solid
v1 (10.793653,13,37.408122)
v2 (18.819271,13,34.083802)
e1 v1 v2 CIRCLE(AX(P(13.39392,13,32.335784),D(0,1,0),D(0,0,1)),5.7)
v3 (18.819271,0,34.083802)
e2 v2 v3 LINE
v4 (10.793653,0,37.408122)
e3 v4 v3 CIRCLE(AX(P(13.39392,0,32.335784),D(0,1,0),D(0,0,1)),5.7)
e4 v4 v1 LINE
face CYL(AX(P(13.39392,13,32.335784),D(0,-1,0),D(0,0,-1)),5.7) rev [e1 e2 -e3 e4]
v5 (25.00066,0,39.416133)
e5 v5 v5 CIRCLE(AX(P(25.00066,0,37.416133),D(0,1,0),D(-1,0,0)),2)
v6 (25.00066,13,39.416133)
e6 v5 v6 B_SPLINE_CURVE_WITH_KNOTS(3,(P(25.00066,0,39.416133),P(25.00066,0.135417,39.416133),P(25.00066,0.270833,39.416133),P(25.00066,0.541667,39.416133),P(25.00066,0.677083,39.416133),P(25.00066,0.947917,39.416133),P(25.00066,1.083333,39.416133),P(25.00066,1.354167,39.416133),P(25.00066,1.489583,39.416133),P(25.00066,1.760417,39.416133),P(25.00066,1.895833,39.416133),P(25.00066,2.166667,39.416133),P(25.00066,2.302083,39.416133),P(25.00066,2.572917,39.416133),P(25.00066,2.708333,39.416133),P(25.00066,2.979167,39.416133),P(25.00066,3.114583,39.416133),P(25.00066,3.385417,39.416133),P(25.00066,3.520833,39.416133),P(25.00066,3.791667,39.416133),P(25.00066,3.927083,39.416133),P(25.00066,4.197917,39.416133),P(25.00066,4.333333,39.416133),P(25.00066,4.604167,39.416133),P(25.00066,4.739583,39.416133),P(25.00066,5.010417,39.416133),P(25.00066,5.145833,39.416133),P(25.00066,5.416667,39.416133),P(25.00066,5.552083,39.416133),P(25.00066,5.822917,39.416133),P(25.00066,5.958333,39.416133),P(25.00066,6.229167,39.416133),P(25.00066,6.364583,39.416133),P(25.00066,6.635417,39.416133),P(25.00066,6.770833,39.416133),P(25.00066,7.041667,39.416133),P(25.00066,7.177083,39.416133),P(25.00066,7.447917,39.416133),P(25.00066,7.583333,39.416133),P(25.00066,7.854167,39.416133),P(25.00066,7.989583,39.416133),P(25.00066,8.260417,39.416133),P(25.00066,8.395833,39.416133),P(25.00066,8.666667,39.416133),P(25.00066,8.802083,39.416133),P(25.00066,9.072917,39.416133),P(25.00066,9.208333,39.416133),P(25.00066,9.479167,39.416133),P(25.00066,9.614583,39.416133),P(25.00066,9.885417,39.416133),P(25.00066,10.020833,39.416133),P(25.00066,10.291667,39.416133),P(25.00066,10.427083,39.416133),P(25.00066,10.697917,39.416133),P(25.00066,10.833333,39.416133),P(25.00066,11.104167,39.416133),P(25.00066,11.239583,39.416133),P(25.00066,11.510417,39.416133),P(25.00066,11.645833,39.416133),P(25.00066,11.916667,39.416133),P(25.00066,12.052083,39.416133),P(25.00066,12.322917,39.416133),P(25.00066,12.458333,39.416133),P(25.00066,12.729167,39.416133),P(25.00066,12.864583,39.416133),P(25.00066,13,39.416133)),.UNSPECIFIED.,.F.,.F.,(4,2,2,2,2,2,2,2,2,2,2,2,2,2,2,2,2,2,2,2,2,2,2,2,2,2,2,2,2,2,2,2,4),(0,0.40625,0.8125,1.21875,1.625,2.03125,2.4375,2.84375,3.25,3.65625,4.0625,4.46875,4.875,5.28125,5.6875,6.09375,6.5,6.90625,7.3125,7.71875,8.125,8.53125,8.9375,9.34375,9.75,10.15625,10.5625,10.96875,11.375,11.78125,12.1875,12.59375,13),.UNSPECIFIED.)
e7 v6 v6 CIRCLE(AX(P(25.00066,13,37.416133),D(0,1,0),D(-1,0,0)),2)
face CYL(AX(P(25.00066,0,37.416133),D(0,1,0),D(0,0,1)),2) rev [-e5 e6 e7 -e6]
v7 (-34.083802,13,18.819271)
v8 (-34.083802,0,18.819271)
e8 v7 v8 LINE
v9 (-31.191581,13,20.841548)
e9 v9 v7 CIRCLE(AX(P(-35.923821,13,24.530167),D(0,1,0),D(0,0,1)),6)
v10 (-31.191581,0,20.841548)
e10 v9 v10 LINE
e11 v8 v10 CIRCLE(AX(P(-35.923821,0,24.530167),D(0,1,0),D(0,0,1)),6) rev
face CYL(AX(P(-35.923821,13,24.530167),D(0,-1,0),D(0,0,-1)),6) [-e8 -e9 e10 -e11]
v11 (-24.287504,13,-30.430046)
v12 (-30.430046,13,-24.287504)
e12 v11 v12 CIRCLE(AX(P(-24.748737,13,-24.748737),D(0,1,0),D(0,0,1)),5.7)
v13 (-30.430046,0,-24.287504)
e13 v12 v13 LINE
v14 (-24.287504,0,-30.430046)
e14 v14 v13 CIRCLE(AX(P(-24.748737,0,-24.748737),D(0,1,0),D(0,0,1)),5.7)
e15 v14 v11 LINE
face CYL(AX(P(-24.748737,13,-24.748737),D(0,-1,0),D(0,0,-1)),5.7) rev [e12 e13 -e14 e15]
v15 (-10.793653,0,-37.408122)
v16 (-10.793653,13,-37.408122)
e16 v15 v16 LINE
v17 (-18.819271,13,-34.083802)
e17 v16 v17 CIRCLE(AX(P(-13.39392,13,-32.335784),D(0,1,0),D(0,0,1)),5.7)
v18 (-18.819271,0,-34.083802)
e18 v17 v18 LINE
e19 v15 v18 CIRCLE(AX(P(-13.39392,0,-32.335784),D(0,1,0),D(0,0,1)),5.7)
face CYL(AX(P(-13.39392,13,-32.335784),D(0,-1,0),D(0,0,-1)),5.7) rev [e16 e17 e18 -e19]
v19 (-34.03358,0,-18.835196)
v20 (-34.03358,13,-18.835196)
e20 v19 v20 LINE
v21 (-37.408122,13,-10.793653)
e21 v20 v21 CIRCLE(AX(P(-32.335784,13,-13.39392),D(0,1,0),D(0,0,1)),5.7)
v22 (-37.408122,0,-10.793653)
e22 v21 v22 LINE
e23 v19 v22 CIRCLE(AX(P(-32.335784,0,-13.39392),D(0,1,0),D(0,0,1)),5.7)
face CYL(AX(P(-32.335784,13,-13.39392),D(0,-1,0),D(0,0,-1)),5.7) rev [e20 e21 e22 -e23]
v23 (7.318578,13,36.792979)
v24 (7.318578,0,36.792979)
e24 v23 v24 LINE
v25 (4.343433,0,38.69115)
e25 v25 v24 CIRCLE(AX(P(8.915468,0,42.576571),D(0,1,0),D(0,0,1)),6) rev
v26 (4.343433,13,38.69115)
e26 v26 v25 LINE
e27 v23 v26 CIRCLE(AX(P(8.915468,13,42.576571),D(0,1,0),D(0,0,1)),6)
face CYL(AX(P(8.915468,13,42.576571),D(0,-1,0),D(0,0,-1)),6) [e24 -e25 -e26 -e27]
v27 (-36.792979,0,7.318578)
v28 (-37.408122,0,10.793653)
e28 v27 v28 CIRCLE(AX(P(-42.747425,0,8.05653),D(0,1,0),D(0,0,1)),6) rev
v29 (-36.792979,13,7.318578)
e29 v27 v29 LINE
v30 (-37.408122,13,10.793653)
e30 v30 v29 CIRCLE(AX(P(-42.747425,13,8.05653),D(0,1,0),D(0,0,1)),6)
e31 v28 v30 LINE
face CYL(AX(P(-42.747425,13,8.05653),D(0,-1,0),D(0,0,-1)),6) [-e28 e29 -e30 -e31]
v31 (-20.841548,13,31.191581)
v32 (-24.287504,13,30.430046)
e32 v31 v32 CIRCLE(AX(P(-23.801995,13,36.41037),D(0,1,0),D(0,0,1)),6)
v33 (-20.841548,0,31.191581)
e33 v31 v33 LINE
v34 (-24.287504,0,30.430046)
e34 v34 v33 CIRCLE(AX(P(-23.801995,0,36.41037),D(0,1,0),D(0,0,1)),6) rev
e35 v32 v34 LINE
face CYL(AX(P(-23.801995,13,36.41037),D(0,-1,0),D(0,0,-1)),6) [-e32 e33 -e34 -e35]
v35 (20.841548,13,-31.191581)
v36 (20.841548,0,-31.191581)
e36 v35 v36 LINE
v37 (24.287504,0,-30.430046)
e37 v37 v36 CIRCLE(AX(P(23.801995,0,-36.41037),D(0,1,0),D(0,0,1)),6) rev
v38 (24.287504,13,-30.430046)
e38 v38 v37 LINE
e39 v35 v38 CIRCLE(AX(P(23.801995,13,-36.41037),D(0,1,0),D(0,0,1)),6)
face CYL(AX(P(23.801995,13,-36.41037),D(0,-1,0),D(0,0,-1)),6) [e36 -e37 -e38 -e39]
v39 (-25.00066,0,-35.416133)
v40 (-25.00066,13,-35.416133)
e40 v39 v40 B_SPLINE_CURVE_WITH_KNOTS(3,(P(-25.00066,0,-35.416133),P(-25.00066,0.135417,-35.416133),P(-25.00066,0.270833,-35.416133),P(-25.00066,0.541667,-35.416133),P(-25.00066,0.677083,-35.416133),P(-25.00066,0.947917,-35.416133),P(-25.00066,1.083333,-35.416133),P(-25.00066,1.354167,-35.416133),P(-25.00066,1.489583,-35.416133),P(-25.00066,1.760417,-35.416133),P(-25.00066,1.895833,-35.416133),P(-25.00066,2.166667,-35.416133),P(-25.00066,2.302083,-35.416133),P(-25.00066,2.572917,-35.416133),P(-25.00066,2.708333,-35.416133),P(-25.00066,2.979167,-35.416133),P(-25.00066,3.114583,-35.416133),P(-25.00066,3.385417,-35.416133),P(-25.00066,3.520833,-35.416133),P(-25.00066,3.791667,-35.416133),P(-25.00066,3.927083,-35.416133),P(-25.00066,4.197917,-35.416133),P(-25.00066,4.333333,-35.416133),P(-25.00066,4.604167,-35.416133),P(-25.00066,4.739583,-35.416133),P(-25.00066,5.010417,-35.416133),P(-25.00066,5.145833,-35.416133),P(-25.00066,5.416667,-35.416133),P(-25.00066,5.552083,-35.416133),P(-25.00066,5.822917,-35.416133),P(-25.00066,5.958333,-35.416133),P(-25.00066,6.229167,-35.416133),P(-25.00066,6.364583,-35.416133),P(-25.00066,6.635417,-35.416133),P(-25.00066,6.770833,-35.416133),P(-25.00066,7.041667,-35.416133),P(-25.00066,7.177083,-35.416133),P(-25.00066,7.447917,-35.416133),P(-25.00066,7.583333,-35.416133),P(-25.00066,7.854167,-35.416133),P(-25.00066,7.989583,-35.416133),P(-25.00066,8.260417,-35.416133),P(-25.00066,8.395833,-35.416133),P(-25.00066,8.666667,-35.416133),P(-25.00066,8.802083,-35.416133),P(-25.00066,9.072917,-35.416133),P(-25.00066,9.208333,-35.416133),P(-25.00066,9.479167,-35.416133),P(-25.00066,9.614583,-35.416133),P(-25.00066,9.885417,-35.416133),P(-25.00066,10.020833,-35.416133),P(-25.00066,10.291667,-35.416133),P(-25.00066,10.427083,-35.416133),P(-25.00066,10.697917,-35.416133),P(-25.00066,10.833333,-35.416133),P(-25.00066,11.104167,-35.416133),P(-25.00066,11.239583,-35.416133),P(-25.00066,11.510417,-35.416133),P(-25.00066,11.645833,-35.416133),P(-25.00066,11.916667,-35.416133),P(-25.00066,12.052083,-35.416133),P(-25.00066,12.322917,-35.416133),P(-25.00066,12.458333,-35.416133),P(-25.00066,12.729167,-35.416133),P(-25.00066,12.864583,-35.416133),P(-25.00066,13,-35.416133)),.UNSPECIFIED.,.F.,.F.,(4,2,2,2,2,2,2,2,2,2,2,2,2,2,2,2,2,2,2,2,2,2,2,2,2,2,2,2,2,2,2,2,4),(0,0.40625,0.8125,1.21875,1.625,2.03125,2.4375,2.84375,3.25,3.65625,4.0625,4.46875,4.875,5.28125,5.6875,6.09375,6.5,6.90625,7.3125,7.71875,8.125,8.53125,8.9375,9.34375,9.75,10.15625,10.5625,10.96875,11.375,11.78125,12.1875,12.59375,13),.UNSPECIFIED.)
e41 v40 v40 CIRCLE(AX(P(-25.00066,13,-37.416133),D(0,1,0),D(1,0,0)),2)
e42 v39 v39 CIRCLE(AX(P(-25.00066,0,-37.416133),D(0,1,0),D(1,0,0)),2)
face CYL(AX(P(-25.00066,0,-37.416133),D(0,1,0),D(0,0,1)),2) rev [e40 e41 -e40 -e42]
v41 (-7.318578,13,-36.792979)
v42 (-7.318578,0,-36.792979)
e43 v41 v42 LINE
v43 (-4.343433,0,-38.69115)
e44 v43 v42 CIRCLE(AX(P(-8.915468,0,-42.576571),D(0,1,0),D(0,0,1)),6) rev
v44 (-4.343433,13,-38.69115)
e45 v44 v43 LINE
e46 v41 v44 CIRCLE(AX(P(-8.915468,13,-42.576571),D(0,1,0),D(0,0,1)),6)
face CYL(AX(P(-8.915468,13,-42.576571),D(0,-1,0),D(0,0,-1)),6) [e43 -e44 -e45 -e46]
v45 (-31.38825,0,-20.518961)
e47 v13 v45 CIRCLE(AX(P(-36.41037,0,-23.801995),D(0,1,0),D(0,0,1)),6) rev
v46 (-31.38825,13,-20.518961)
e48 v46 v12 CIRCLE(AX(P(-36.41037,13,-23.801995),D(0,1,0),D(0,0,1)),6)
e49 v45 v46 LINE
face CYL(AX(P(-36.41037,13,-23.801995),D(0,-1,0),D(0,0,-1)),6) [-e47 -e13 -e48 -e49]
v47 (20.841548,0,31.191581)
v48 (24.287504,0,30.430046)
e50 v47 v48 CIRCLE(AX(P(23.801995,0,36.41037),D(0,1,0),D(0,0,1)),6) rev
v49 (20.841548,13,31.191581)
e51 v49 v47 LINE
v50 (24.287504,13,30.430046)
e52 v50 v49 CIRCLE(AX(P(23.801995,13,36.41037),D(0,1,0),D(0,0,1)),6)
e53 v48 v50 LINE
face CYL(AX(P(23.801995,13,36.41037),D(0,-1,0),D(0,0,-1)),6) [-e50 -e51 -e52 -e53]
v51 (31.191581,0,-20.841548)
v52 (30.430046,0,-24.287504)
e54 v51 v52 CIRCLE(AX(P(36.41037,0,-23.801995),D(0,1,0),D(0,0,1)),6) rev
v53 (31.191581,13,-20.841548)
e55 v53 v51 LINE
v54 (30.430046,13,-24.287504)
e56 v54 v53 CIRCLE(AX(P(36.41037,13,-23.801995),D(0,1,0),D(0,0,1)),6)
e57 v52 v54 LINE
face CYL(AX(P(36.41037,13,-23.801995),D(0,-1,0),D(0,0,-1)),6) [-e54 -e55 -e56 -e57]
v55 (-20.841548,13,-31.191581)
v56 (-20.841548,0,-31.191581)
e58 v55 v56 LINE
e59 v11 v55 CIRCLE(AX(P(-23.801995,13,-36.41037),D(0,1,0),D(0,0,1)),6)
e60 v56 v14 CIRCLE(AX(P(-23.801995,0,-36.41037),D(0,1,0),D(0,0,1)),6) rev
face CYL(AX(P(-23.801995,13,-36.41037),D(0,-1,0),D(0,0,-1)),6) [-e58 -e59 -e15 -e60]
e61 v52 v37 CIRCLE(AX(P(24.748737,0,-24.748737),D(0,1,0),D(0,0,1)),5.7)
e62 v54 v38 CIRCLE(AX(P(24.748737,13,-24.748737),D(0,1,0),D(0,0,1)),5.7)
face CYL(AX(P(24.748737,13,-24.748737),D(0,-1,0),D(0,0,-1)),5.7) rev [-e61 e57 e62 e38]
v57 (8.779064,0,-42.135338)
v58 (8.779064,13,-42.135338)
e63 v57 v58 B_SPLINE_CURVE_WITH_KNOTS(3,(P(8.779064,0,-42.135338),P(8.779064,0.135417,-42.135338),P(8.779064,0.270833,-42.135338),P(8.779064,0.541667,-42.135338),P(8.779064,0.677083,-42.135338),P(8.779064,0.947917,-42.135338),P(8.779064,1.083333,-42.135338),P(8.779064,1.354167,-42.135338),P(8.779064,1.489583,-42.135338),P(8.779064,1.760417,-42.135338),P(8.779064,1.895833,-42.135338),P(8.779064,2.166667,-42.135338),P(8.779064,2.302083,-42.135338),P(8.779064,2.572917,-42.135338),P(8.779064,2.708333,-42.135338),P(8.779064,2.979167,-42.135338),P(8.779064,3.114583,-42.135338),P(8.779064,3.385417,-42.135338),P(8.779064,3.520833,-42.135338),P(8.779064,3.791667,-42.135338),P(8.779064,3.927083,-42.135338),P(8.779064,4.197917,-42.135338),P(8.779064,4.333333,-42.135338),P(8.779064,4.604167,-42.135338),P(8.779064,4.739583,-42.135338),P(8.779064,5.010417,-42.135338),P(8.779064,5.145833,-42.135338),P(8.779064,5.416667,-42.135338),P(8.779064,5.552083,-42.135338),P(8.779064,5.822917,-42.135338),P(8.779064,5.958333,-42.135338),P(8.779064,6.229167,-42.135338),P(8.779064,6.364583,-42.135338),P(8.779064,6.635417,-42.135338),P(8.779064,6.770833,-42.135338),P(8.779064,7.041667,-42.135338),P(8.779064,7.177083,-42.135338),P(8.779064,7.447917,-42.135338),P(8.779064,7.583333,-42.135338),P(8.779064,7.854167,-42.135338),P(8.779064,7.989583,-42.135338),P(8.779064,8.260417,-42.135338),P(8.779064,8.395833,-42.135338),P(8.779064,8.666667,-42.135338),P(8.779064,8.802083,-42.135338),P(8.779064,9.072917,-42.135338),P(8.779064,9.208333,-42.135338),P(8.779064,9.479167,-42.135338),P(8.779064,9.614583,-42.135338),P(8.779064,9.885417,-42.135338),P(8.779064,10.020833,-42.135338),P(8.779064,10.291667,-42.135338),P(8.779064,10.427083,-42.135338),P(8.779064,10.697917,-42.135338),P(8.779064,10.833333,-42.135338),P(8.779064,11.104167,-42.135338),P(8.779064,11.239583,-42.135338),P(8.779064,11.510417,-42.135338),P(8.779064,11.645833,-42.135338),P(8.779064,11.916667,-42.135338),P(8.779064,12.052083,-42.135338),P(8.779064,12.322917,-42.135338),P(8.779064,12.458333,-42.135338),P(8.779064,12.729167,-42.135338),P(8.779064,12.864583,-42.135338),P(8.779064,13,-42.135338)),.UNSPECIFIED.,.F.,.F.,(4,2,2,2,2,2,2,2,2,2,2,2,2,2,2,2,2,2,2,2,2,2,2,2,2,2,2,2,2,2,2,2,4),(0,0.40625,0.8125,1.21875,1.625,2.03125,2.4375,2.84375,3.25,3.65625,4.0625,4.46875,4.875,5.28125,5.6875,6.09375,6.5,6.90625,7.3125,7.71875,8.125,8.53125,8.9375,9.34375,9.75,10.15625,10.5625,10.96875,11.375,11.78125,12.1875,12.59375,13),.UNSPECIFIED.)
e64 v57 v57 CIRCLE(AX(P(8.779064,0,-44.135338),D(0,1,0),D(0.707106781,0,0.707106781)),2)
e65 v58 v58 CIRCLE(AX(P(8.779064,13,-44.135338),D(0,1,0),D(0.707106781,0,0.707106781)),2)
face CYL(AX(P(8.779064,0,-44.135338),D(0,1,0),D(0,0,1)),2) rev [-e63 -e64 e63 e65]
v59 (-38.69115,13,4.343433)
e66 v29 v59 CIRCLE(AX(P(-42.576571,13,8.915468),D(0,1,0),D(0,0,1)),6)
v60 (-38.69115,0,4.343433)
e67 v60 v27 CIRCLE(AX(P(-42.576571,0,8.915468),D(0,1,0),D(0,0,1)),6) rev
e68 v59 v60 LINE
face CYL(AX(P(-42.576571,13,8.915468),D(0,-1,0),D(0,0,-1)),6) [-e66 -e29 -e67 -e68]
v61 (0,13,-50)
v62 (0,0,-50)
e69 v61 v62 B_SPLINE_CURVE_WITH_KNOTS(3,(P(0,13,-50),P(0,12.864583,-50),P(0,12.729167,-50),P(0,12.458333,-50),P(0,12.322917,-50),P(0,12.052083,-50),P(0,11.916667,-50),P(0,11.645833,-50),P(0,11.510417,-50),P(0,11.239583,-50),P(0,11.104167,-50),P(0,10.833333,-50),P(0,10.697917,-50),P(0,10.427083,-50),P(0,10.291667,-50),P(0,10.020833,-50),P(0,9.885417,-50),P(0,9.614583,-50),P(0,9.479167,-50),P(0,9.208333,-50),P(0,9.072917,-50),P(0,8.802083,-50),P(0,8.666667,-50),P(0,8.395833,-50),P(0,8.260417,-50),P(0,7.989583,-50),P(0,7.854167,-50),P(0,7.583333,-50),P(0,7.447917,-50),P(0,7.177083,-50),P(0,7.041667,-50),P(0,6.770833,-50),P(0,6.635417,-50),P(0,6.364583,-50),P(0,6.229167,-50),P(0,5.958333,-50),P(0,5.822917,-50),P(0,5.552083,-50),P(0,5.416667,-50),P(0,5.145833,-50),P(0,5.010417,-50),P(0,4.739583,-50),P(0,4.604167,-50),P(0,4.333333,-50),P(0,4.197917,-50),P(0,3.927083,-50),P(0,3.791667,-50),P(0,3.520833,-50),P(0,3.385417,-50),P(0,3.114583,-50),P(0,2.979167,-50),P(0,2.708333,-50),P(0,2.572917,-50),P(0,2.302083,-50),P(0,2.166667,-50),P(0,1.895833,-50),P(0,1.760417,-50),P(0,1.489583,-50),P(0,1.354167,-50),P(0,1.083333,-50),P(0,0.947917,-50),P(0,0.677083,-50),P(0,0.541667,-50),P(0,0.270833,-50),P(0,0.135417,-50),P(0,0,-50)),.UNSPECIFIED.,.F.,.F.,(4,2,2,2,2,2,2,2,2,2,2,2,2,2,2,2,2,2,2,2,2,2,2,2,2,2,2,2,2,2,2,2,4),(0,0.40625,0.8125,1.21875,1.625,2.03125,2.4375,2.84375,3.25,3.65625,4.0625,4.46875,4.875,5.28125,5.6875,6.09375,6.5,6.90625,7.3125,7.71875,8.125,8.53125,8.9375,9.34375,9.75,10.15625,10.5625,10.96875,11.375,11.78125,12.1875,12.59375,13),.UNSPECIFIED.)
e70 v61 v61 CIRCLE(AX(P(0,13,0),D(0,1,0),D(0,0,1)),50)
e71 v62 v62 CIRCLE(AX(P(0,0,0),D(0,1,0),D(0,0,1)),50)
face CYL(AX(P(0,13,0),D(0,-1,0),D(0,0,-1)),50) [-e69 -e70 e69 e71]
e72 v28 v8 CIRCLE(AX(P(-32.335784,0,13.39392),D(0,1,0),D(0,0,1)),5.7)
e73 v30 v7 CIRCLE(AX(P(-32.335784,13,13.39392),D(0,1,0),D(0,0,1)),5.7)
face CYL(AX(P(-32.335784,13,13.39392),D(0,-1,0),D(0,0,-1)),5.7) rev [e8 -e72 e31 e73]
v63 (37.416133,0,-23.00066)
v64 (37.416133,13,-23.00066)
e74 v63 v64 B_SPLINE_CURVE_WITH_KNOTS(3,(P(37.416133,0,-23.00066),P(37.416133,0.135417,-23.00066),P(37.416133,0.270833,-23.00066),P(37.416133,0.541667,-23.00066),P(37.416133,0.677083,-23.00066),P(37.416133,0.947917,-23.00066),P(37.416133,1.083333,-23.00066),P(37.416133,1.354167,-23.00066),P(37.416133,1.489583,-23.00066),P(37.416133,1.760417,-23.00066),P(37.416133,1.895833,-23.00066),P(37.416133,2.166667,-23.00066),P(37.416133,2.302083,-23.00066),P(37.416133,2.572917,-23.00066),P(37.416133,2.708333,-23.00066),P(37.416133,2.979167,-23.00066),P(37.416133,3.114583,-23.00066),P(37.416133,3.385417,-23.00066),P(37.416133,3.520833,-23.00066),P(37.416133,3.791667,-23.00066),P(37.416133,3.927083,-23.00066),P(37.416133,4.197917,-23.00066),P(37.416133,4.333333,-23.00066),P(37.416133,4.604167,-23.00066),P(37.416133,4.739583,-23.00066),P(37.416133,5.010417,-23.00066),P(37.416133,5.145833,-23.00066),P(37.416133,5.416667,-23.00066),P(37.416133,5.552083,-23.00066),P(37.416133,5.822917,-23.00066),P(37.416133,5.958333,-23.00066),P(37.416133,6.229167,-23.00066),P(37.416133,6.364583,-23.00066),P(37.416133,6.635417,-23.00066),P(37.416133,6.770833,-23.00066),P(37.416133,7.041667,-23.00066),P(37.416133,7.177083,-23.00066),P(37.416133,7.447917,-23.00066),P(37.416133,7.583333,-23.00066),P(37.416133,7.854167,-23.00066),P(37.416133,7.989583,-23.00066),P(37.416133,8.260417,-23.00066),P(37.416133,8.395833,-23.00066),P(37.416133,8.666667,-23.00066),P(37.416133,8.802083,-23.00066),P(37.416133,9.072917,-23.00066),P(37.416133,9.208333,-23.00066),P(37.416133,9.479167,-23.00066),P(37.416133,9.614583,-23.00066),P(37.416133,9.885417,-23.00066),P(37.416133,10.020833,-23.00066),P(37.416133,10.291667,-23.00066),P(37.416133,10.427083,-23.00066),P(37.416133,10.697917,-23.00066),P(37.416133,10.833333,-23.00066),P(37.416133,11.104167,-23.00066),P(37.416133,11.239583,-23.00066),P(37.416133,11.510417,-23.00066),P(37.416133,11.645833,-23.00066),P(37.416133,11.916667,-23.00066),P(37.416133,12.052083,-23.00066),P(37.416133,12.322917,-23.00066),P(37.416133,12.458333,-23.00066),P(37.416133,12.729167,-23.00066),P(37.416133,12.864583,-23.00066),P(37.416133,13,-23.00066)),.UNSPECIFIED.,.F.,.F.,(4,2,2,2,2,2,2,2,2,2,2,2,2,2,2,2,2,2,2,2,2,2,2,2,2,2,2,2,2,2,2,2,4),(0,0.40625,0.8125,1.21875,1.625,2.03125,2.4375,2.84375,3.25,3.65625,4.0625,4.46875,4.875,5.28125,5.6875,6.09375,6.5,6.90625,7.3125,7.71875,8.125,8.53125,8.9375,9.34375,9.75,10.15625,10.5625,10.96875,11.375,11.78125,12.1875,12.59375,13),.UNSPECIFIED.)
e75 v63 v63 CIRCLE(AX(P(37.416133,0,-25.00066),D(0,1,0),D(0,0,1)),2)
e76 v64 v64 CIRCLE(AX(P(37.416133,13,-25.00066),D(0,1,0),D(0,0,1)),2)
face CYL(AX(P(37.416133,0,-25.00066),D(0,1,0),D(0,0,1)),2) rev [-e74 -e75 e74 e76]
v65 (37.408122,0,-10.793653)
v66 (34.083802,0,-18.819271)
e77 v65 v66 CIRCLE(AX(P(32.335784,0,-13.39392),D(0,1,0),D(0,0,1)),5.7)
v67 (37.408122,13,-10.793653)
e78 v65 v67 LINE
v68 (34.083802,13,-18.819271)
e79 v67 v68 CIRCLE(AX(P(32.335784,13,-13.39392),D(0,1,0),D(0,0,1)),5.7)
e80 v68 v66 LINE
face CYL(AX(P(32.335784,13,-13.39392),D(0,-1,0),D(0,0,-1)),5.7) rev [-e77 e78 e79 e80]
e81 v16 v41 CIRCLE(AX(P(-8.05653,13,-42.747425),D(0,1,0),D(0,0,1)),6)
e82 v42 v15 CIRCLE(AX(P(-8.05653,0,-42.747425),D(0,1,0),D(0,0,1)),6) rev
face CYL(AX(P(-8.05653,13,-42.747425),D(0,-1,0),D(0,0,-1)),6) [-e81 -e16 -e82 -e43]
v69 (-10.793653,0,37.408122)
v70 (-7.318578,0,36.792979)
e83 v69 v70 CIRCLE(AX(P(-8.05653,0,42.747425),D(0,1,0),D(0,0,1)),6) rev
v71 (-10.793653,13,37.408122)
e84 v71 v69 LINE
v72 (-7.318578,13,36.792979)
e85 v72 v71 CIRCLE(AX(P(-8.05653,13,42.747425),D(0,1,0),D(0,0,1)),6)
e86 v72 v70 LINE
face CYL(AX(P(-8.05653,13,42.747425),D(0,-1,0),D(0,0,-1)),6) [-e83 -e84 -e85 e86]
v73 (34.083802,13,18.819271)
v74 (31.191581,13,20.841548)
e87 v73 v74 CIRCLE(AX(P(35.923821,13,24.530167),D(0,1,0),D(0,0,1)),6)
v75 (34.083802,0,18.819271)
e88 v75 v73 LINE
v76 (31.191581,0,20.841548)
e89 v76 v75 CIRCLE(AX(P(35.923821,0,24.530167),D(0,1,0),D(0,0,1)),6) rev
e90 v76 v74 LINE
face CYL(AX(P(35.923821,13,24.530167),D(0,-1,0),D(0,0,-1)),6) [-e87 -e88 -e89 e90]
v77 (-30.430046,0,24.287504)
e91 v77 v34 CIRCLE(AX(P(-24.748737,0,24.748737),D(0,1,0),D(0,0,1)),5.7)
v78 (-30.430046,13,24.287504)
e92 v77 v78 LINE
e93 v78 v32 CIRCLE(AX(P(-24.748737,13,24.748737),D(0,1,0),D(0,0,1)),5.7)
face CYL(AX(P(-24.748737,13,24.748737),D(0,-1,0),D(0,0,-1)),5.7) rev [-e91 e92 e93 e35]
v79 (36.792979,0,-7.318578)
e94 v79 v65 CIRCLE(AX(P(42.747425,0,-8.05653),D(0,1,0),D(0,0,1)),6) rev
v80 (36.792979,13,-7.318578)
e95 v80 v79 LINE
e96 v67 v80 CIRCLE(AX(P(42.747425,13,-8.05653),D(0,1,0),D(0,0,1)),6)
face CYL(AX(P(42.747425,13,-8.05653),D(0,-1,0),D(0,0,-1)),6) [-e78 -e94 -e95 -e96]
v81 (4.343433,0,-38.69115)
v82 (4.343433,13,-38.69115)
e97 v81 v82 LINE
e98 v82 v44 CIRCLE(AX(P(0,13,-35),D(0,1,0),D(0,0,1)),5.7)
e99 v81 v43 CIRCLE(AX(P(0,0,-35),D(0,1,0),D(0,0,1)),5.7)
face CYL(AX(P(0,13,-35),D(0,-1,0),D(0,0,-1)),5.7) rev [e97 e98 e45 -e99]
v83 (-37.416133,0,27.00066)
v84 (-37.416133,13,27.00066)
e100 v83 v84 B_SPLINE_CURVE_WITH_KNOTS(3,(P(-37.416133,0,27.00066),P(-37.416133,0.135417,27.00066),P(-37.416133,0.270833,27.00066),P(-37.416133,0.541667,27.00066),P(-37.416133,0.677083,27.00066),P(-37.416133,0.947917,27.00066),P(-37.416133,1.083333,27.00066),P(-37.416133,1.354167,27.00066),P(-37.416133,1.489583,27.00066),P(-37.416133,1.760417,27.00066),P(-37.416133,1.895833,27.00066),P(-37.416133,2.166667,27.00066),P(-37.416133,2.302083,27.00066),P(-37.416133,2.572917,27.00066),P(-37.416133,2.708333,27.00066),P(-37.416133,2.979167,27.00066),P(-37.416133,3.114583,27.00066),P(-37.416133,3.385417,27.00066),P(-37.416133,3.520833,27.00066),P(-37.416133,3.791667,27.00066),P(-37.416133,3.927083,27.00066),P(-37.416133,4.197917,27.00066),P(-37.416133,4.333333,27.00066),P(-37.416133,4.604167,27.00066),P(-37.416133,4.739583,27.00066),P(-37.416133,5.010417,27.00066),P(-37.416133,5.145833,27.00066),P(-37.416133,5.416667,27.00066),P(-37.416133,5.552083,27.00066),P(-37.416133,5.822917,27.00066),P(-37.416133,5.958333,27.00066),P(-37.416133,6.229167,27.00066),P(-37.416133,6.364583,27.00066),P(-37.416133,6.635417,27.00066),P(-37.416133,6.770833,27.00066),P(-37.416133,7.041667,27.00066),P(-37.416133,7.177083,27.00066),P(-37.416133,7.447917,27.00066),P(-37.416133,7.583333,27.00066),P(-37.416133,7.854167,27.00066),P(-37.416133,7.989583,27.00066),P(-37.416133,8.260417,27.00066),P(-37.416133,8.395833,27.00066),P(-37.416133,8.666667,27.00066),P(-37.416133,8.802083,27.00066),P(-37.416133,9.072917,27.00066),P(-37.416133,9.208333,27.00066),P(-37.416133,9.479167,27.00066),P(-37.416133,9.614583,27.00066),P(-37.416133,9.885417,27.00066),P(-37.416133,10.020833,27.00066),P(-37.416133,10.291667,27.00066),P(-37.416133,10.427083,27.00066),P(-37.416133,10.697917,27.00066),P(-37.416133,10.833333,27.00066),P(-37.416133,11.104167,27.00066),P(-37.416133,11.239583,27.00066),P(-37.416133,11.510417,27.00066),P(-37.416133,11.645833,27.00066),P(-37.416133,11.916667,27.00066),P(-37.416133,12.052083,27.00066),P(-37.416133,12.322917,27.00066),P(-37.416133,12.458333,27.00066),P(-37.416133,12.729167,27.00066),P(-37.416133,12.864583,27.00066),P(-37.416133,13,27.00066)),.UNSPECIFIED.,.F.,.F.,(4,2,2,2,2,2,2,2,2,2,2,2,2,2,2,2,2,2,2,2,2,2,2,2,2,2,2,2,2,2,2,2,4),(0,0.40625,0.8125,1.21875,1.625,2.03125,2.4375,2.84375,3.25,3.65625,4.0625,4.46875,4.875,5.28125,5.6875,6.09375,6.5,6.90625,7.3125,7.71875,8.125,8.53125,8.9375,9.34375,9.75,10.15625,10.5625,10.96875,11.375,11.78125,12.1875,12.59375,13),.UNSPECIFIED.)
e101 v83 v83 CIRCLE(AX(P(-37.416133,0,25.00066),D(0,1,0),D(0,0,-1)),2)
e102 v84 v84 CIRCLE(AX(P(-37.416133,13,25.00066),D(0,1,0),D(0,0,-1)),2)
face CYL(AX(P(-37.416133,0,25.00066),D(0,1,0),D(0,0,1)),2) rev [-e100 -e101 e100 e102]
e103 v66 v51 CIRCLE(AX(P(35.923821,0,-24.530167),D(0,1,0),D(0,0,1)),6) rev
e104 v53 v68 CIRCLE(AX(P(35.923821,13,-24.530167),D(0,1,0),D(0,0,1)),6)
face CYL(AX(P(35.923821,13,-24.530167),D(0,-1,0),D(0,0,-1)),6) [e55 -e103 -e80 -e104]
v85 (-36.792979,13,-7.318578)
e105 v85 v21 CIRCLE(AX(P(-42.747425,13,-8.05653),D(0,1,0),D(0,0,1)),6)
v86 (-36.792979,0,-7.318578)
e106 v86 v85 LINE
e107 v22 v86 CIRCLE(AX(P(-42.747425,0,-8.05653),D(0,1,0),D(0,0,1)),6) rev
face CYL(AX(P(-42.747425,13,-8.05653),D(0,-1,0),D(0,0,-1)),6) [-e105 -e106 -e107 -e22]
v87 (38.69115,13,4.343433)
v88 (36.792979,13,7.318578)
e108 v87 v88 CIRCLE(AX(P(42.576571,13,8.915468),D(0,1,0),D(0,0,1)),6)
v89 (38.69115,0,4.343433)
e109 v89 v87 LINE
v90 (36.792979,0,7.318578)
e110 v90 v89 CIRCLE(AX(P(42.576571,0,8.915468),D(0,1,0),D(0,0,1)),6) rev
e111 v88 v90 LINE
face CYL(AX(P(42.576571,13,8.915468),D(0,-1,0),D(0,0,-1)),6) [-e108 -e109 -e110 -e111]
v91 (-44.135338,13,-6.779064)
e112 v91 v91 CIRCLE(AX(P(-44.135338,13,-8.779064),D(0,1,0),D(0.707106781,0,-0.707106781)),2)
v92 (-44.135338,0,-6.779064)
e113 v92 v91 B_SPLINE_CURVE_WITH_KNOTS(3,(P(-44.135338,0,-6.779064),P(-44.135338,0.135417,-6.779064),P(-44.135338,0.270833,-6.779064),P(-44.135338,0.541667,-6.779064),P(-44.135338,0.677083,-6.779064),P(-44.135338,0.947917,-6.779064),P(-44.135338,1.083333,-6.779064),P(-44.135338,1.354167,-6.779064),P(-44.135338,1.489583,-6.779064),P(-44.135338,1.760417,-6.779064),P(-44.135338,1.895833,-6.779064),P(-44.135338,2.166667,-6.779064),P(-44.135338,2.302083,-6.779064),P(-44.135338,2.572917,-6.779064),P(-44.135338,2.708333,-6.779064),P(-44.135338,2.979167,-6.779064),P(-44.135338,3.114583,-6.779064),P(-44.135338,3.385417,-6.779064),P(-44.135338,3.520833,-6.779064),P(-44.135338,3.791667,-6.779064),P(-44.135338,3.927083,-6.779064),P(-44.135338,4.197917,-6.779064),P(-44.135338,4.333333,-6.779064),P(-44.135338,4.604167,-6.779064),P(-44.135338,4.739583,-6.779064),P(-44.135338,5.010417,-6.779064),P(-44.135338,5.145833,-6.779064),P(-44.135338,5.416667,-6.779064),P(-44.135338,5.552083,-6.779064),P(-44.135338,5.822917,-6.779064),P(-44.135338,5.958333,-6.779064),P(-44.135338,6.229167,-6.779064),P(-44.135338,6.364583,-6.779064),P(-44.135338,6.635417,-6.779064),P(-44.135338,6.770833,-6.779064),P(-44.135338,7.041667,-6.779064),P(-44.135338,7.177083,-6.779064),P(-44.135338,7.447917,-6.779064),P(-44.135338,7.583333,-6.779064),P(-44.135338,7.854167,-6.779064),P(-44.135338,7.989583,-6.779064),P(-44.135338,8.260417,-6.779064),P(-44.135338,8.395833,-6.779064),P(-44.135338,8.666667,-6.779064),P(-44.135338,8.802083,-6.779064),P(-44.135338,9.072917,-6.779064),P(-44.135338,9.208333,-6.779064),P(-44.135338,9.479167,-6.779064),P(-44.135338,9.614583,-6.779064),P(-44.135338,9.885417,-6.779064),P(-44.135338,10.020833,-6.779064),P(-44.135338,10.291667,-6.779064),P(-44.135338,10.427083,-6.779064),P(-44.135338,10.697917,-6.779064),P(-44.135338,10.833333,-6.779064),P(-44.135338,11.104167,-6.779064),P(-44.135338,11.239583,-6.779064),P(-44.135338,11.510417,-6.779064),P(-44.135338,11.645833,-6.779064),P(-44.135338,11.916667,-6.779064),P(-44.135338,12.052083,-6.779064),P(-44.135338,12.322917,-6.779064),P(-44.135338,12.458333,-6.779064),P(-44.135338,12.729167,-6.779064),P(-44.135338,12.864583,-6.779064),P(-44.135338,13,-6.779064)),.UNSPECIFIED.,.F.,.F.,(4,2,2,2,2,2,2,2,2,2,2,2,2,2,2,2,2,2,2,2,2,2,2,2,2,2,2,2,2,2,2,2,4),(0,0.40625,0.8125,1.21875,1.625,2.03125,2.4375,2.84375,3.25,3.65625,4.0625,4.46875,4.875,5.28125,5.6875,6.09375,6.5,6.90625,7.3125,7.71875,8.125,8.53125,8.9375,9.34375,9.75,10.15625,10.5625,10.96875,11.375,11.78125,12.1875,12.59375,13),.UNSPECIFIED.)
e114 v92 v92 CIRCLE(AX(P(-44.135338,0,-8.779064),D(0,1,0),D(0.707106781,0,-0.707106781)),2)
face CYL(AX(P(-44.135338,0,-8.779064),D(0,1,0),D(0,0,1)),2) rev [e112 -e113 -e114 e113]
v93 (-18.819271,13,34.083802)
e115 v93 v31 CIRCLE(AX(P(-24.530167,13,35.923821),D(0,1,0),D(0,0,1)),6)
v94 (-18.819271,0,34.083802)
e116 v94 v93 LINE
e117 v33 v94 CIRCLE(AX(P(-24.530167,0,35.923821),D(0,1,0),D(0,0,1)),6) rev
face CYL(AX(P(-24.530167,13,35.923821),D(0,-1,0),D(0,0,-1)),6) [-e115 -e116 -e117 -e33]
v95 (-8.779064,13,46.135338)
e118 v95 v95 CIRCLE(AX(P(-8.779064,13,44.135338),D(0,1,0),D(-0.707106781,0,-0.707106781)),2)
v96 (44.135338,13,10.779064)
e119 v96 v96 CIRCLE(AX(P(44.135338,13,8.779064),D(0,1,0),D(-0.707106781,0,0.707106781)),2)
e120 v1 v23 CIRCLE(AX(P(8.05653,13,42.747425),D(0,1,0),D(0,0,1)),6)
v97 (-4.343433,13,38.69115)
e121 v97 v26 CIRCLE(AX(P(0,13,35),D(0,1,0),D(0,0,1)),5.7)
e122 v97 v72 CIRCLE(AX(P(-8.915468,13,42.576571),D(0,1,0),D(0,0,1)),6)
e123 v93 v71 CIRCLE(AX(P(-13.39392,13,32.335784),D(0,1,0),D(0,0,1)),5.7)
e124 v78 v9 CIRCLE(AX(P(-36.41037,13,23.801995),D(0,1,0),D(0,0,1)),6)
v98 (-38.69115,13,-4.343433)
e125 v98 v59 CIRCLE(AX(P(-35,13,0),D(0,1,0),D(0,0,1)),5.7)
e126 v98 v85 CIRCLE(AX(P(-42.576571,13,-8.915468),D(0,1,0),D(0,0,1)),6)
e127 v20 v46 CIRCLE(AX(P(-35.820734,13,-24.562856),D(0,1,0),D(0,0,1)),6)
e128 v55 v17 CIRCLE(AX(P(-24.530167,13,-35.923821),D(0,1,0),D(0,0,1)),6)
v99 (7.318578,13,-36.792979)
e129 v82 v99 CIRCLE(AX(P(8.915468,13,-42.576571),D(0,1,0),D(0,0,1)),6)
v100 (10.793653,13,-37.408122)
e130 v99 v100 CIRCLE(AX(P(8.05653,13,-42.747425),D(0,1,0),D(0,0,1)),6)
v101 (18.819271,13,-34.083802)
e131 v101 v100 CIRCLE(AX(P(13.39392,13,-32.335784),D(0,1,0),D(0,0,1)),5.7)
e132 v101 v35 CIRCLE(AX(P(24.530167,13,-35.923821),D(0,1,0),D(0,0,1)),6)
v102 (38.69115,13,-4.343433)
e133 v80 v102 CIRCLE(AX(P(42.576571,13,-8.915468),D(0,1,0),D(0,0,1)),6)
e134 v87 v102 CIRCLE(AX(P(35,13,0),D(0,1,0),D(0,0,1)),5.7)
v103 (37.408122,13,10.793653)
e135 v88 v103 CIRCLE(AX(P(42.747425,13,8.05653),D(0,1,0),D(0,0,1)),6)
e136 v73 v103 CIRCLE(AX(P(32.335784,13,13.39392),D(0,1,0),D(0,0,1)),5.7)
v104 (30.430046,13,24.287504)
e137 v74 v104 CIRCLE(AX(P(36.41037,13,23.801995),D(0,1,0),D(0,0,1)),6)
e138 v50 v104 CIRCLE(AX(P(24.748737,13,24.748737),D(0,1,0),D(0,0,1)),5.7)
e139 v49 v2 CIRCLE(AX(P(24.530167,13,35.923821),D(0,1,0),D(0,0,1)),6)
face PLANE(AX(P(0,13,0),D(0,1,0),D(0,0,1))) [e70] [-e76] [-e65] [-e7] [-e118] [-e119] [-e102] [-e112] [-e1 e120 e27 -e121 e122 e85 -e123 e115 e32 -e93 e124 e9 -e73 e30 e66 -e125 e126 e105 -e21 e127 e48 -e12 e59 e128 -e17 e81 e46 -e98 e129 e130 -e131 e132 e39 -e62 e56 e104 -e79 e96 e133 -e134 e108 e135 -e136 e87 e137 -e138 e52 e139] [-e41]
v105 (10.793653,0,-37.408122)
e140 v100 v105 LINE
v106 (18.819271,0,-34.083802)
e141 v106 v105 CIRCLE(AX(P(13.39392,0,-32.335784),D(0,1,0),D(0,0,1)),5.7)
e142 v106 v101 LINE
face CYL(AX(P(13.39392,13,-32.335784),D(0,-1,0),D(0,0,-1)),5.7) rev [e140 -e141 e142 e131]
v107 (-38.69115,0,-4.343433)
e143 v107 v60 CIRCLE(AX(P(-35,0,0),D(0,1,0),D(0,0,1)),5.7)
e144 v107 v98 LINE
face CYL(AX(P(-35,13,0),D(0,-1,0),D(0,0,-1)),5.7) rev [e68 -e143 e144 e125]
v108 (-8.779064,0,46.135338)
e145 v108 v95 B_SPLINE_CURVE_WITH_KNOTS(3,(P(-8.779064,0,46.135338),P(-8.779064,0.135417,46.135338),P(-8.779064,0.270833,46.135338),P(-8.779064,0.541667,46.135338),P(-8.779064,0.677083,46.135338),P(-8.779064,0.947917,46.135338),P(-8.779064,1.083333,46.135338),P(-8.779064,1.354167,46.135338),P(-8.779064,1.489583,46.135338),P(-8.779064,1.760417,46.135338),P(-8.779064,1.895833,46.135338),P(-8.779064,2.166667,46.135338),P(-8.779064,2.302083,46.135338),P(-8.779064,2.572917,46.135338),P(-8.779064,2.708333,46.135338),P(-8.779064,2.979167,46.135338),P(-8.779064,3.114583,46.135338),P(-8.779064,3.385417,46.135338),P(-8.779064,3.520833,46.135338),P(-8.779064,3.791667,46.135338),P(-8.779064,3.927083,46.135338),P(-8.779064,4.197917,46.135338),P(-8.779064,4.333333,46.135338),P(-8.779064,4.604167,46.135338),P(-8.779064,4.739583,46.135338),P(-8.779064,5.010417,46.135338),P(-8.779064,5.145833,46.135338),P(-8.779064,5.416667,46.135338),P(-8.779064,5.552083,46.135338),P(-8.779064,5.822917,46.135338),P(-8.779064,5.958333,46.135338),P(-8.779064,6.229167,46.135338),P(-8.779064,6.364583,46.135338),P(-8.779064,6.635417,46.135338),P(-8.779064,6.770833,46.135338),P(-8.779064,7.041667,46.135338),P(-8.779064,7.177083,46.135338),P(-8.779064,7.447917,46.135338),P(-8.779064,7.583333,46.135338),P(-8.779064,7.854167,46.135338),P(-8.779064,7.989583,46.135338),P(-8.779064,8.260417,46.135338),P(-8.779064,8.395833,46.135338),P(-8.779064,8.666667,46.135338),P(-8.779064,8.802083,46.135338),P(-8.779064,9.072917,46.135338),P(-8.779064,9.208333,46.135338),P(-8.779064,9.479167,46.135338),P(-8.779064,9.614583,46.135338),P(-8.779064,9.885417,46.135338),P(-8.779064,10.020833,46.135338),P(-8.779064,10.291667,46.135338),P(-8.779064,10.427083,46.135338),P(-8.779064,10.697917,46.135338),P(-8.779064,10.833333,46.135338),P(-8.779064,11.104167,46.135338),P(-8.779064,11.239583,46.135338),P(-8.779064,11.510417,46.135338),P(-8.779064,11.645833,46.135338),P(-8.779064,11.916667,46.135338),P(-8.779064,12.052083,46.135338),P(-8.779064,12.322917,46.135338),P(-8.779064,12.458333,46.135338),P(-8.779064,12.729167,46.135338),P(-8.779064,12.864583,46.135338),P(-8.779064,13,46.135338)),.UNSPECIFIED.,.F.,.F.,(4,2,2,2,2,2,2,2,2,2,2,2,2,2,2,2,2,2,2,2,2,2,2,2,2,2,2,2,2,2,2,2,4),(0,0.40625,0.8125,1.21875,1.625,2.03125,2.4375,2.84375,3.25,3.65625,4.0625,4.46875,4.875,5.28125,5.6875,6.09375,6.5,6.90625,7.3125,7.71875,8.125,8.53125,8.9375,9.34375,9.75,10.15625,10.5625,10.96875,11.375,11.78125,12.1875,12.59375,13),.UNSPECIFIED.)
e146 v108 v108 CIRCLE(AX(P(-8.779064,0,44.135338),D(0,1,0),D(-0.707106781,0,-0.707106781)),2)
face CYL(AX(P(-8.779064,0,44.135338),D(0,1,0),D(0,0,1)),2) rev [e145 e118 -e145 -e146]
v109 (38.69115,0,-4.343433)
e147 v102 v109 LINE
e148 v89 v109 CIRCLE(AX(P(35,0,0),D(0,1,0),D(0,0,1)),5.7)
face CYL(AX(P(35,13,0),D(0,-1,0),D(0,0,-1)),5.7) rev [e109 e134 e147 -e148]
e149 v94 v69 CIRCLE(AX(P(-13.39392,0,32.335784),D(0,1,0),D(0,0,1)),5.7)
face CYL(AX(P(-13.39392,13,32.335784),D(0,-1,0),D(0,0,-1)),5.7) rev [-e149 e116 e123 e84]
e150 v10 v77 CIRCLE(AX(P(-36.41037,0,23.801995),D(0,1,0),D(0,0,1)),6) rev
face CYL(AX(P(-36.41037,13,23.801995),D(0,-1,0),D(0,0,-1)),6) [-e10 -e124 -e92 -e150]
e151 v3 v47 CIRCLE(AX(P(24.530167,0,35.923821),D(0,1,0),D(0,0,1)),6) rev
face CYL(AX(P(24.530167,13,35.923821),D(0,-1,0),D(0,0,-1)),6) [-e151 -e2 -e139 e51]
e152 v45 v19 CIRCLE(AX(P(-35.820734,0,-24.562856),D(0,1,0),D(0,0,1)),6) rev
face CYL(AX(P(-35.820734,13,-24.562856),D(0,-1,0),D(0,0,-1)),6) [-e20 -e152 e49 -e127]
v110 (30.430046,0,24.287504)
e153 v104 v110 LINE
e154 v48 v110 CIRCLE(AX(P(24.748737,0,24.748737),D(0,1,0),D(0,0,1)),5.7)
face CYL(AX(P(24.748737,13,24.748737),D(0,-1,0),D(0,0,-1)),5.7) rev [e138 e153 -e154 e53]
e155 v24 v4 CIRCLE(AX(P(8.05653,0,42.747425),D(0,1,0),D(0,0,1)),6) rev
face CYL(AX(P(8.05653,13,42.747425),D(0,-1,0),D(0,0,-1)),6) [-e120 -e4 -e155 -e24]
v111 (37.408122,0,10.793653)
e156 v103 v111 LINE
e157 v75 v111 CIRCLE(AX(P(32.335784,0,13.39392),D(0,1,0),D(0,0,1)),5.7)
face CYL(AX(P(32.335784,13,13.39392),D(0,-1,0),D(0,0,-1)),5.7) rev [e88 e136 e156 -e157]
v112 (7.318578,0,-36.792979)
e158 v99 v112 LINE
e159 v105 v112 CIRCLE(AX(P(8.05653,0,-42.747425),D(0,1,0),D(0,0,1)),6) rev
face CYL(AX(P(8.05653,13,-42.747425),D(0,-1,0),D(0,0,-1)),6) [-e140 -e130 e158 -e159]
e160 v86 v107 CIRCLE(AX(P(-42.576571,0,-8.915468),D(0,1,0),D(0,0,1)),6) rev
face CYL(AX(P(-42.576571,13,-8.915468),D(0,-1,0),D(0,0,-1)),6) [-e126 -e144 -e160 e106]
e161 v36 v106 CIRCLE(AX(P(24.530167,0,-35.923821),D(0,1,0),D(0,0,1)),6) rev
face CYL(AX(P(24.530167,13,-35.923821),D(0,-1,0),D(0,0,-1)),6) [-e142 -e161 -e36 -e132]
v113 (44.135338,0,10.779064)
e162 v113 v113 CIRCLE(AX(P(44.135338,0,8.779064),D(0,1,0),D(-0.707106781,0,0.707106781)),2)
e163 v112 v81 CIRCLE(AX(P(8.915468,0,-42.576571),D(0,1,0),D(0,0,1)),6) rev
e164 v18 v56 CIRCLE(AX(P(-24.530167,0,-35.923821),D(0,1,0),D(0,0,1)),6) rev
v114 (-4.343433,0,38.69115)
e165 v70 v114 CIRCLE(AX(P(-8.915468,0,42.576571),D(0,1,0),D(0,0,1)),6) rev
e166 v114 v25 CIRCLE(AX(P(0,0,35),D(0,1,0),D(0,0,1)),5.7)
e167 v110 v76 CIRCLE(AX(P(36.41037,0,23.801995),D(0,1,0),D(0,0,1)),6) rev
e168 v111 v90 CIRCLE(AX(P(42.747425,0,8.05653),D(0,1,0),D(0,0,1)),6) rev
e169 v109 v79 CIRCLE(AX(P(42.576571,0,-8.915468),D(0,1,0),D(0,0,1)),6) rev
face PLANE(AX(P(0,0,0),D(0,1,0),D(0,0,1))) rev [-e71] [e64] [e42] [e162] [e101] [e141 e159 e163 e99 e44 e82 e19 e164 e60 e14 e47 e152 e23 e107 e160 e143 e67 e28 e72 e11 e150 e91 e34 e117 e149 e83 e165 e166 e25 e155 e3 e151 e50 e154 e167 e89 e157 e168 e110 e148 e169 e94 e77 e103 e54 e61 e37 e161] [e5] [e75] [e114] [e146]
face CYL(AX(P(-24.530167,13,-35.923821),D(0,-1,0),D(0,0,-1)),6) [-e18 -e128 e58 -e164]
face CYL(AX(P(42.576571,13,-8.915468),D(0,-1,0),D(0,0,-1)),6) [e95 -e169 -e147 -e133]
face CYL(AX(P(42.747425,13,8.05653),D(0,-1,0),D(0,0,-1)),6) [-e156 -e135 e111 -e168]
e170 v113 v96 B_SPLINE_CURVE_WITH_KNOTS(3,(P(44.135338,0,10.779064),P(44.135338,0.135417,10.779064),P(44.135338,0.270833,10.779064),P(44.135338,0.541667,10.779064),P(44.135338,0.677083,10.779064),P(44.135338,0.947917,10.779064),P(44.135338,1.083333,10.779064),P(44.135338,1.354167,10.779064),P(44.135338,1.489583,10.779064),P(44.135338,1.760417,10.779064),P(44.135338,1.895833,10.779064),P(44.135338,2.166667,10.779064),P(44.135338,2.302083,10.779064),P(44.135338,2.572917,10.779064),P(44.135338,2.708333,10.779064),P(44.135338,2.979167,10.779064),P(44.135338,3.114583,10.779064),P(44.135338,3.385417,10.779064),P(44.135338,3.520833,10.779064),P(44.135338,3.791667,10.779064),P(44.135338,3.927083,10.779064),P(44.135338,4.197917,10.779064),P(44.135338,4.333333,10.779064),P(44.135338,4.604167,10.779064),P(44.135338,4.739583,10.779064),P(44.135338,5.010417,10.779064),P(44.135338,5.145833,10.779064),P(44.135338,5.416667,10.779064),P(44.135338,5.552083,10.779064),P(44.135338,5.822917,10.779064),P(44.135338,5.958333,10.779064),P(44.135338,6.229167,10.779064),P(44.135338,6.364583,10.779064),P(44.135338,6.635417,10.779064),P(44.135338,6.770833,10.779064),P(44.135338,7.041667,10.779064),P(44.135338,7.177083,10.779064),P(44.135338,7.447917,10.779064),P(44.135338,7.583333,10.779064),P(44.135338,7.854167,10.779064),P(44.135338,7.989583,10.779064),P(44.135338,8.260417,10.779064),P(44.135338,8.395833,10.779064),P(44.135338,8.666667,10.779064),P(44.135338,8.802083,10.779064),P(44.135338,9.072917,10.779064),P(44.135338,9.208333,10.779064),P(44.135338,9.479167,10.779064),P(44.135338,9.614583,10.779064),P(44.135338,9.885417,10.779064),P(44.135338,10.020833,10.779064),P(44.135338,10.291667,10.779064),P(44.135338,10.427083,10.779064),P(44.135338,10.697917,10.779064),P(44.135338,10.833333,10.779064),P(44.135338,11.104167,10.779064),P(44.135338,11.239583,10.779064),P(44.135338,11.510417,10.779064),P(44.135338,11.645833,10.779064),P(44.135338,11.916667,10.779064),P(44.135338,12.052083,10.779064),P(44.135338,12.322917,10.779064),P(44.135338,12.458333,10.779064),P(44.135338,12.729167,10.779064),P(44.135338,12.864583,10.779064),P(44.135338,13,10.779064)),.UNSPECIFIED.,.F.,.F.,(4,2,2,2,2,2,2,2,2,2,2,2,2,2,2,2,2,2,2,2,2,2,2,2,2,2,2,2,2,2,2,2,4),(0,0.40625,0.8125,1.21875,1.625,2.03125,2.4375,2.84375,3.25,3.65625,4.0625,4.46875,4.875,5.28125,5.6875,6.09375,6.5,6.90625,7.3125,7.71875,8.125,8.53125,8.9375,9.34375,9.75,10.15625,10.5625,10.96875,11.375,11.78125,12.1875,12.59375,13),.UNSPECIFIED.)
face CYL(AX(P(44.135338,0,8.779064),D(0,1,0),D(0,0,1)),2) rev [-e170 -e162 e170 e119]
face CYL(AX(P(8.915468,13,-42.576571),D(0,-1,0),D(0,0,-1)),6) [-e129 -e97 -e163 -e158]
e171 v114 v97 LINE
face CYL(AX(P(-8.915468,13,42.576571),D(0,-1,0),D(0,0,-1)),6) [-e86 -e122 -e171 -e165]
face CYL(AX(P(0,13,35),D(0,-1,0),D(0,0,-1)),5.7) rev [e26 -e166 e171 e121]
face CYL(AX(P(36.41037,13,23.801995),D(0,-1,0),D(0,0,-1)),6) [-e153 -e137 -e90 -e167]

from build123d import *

# Parameters (mm, degrees)
SKETCH1_R           = 50
BOSS_EXTRUDE1_DEPTH = 13
FILLET1_R           = 6
FILLET2_R           = 6
SKETCH2_R           = 2
CUT_EXTRUDE1_DEPTH  = 13
CIRPATTERN1_COUNT   = 8


with BuildPart() as part:
    # Sketch1 → Boss-Extrude1 (new body)
    with BuildSketch(Plane(origin=(0, 0, 0), x_dir=(1, 0, 0), z_dir=(0, 1, 0))):
        with Locations(Location((0, 0, 0), (0, 0, 90))):
            Circle(SKETCH1_R)
        with BuildLine():
            ThreePointArc((36.323181231, 9.32075669), (36.779448015, 7.315887076), (37.125142857, 5.289023335))
            ThreePointArc((37.125142857, 5.289023335), (39.722463038, 3.191918366), (40.7, 0))
            ThreePointArc((40.7, 0), (39.722463038, -3.191918366), (37.125142857, -5.289023335))
            ThreePointArc((37.125142857, -5.289023335), (36.779448015, -7.315887076), (36.323181231, -9.32075669))
            ThreePointArc((36.323181231, -9.32075669), (37.590218254, -11.184640418), (38.035783638, -13.393920133))
            ThreePointArc((38.035783638, -13.393920133), (36.344793491, -17.445813517), (32.275138024, -19.093597502))
            ThreePointArc((32.275138024, -19.093597502), (31.180110461, -20.833883738), (29.991344533, -22.511536001))
            ThreePointArc((29.991344533, -22.511536001), (30.333218561, -23.606997658), (30.448737342, -24.748737342))
            ThreePointArc((30.448737342, -24.748737342), (27.890230009, -29.504893754), (22.511536001, -29.991344533))
            ThreePointArc((22.511536001, -29.991344533), (20.833883738, -31.180110461), (19.093597502, -32.275138024))
            ThreePointArc((19.093597502, -32.275138024), (19.093839474, -32.305460402), (19.093920133, -32.335783638))
            ThreePointArc((19.093920133, -32.335783638), (15.547169813, -37.613426655), (9.32075669, -36.323181231))
            ThreePointArc((9.32075669, -36.323181231), (7.315887076, -36.779448015), (5.289023335, -37.125142857))
            ThreePointArc((5.289023335, -37.125142857), (0, -40.7), (-5.289023335, -37.125142857))
            ThreePointArc((-5.289023335, -37.125142857), (-7.315887076, -36.779448015), (-9.32075669, -36.323181231))
            ThreePointArc((-9.32075669, -36.323181231), (-15.575215697, -37.601896973), (-19.093597502, -32.275138024))
            ThreePointArc((-19.093597502, -32.275138024), (-20.833883738, -31.180110461), (-22.511536001, -29.991344533))
            ThreePointArc((-22.511536001, -29.991344533), (-28.779245994, -28.779245994), (-29.991344533, -22.511536001))
            ThreePointArc((-29.991344533, -22.511536001), (-31.180110461, -20.833883738), (-32.275138024, -19.093597502))
            ThreePointArc((-32.275138024, -19.093597502), (-37.601896973, -15.575215697), (-36.323181231, -9.32075669))
            ThreePointArc((-36.323181231, -9.32075669), (-36.779448015, -7.315887076), (-37.125142857, -5.289023335))
            ThreePointArc((-37.125142857, -5.289023335), (-40.7, 0), (-37.125142857, 5.289023335))
            ThreePointArc((-37.125142857, 5.289023335), (-36.779448015, 7.315887076), (-36.323181231, 9.32075669))
            ThreePointArc((-36.323181231, 9.32075669), (-37.601896973, 15.575215697), (-32.275138024, 19.093597502))
            ThreePointArc((-32.275138024, 19.093597502), (-31.180110461, 20.833883738), (-29.991344533, 22.511536001))
            ThreePointArc((-29.991344533, 22.511536001), (-28.779245994, 28.779245994), (-22.511536001, 29.991344533))
            ThreePointArc((-22.511536001, 29.991344533), (-20.833883738, 31.180110461), (-19.093597502, 32.275138024))
            ThreePointArc((-19.093597502, 32.275138024), (-15.575215697, 37.601896973), (-9.32075669, 36.323181231))
            ThreePointArc((-9.32075669, 36.323181231), (-7.315887076, 36.779448015), (-5.289023335, 37.125142857))
            ThreePointArc((-5.289023335, 37.125142857), (0, 40.7), (5.289023335, 37.125142857))
            ThreePointArc((5.289023335, 37.125142857), (7.315887076, 36.779448015), (9.32075669, 36.323181231))
            ThreePointArc((9.32075669, 36.323181231), (15.547169813, 37.613426655), (19.093920133, 32.335783638))
            ThreePointArc((19.093920133, 32.335783638), (19.093839474, 32.305460402), (19.093597502, 32.275138024))
            ThreePointArc((19.093597502, 32.275138024), (20.833883738, 31.180110461), (22.511536001, 29.991344533))
            ThreePointArc((22.511536001, 29.991344533), (27.890230009, 29.504893754), (30.448737342, 24.748737342))
            ThreePointArc((30.448737342, 24.748737342), (30.333218561, 23.606997658), (29.991344533, 22.511536001))
            ThreePointArc((29.991344533, 22.511536001), (31.180110461, 20.833883738), (32.275138024, 19.093597502))
            ThreePointArc((32.275138024, 19.093597502), (36.344793491, 17.445813517), (38.035783638, 13.393920133))
            ThreePointArc((38.035783638, 13.393920133), (37.590218254, 11.184640418), (36.323181231, 9.32075669))
        make_face(mode=Mode.SUBTRACT)
    extrude(amount=BOSS_EXTRUDE1_DEPTH)

    # Fillet1
    # the kernel refuses this fillet: 6 mm, written as the material it takes off along each edge
    with BuildSketch(Plane(origin=(-19.093597502, -6.083636121, -32.275138024), x_dir=(0.14995847999359607, 0, -0.9886922950433115), z_dir=(0, 1, 0)), Plane(origin=(-29.991344533, -6.083636121, -22.511536001), x_dir=(-0.2398125906274579, 0, -0.9708192011783384), z_dir=(0, 1, 0)), Plane(origin=(-36.323181231, -6.083636121, -9.32075669), x_dir=(-0.5930743682320851, 0, -0.8051476844319388), z_dir=(0, 1, 0)), Plane(origin=(-37.125142857, -6.083636121, 5.289023335), x_dir=(-0.8560459495059065, 0, -0.5168997314127094), z_dir=(0, 1, 0)), Plane(origin=(-32.275138024, -6.083636121, 19.093597502), x_dir=(-0.988692295043333, 0, -0.14995847999345324), z_dir=(0, 1, 0)), Plane(origin=(-22.511536001, -6.083636121, 29.991344533), x_dir=(-0.9708192011784058, 0, 0.23981259062718507), z_dir=(0, 1, 0)), Plane(origin=(-9.32075669, -6.083636121, 36.323181231), x_dir=(-0.8051476844318383, 0, 0.5930743682322216), z_dir=(0, 1, 0)), Plane(origin=(5.289023335, -6.083636121, 37.125142857), x_dir=(-0.5168997314124754, 0, 0.8560459495060478), z_dir=(0, 1, 0)), Plane(origin=(29.991344533, -6.083636121, 22.511536001), x_dir=(0.2398125906274932, 0, 0.9708192011783298), z_dir=(0, 1, 0)), Plane(origin=(36.323181231, -6.083636121, 9.32075669), x_dir=(0.5930743682321865, 0, 0.8051476844318642), z_dir=(0, 1, 0)), Plane(origin=(37.125142857, -6.083636121, -5.289023335), x_dir=(0.8560459495059013, 0, 0.5168997314127179), z_dir=(0, 1, 0)), Plane(origin=(32.275138024, -6.083636121, -19.093597502), x_dir=(0.9886922950433297, 0, 0.14995847999347464), z_dir=(0, 1, 0)), Plane(origin=(9.32075669, -6.083636121, -36.323181231), x_dir=(0.8051476844318497, 0, -0.5930743682322063), z_dir=(0, 1, 0)), Plane(origin=(-5.289023335, -6.083636121, -37.125142857), x_dir=(0.5168997314124864, 0, -0.8560459495060411), z_dir=(0, 1, 0))) as fillet1_piece_1:
        with BuildLine():
            CenterArc((2.792165198, 5.922245026), FILLET1_R, 222.951284649, 37.814580314)
            ThreePointArc((-1.599434612, 1.833987316), (-0.784836973, 0.929970912), (0, 0))
            ThreePointArc((0, 0), (0.914674806, 0.073867225), (1.829349612, 0))
        make_face()
    extrude(amount=25.167272242, mode=Mode.SUBTRACT)
    with BuildSketch(Plane(origin=(-22.511536001, -6.083636121, -29.991344533), x_dir=(0.8188257163349287, 0, -0.5740421990312129), z_dir=(0, 1, 0)), Plane(origin=(-37.125142857, -6.083636121, -5.289023335), x_dir=(0.17308808500835637, 0, -0.9849063482525331), z_dir=(0, 1, 0)), Plane(origin=(-36.323181231, -6.083636121, 9.32075669), x_dir=(-0.21699480284666314, 0, -0.9761727590634447), z_dir=(0, 1, 0)), Plane(origin=(-29.991344533, -6.083636121, 22.511536001), x_dir=(-0.5740421990310322, 0, -0.8188257163350555), z_dir=(0, 1, 0)), Plane(origin=(-19.093597502, -6.083636121, 32.275138024), x_dir=(-0.8436968741184279, 0, -0.5368198809682758), z_dir=(0, 1, 0)), Plane(origin=(-5.289023335, -6.083636121, 37.125142857), x_dir=(-0.9849063482524983, 0, -0.17308808500855408), z_dir=(0, 1, 0)), Plane(origin=(22.511536001, -6.083636121, 29.991344533), x_dir=(-0.8188257163349197, 0, 0.574042199031226), z_dir=(0, 1, 0)), Plane(origin=(32.275138024, -6.083636121, 19.093597502), x_dir=(-0.5368198809683398, 0, 0.8436968741183872), z_dir=(0, 1, 0)), Plane(origin=(37.125142857, -6.083636121, 5.289023335), x_dir=(-0.17308808500835057, 0, 0.984906348252534), z_dir=(0, 1, 0)), Plane(origin=(36.323181231, -6.083636121, -9.32075669), x_dir=(0.21699480284658396, 0, 0.9761727590634621), z_dir=(0, 1, 0)), Plane(origin=(29.991344533, -6.083636121, -22.511536001), x_dir=(0.5740421990310425, 0, 0.8188257163350484), z_dir=(0, 1, 0)), Plane(origin=(19.093597502, -6.083636121, -32.275138024), x_dir=(0.8436968741184294, 0, 0.5368198809682734), z_dir=(0, 1, 0)), Plane(origin=(5.289023335, -6.083636121, -37.125142857), x_dir=(0.9849063482524999, 0, 0.17308808500854556), z_dir=(0, 1, 0)), Plane(origin=(-9.32075669, -6.083636121, -36.323181231), x_dir=(0.976172759063475, 0, -0.2169948028465263), z_dir=(0, 1, 0))) as fillet1_piece_2:
        with BuildLine():
            CenterArc((2.628130804, 5.996840928), FILLET1_R, 230.326071091, 37.814580314)
            ThreePointArc((-1.202375121, 1.378700139), (-0.54551709, 0.73790072), (0, 0))
            ThreePointArc((0, 0), (1.216727224, 0.0197442), (2.433454448, 0))
        make_face()
    extrude(amount=25.167272242, mode=Mode.SUBTRACT)
    with BuildSketch(Plane(origin=(9.32075669, -6.083636122, 36.323181231), x_dir=(-0.9761727590638747, 0, 0.2169948028447281), z_dir=(0, 1, 0))) as fillet1_piece_3:
        with BuildLine():
            CenterArc((2.628130805, 5.996840928), FILLET1_R, 230.326071091, 37.814580314)
            ThreePointArc((-1.202375121, 1.378700139), (-0.54551709, 0.73790072), (0, 0))
            ThreePointArc((0, 0), (1.216727224, 0.0197442), (2.433454449, 0))
        make_face()
    extrude(amount=25.167272243, mode=Mode.SUBTRACT)
    with BuildSketch(Plane(origin=(19.093597502, -6.083636121, 32.275138024), x_dir=(-0.14995847999251055, 0, 0.988692295043476), z_dir=(0, 1, 0))) as fillet1_piece_4:
        with BuildLine():
            CenterArc((2.792165198, 5.922245026), FILLET1_R, 222.951284649, 37.814580314)
            ThreePointArc((-1.599434612, 1.833987316), (-0.784836973, 0.929970912), (0, 0))
            ThreePointArc((0, 0), (0.914674806, 0.073867225), (1.829349613, 0))
        make_face()
    extrude(amount=25.167272242, mode=Mode.SUBTRACT)
    with BuildSketch(Plane(origin=(22.511536001, -6.083636121, -29.991344533), x_dir=(-0.81882571633492, 0, -0.5740421990312257), z_dir=(0, 1, 0))) as fillet1_piece_5:
        with BuildLine():
            CenterArc((2.628130804, -5.996840928), FILLET1_R, 91.859348595, 37.814580314)
            ThreePointArc((-1.202375121, -1.378700139), (-0.54551709, -0.73790072), (0, 0))
            ThreePointArc((0, 0), (1.216727224, -0.0197442), (2.433454448, 0))
        make_face()
    extrude(amount=25.167272242, mode=Mode.SUBTRACT)

    # Fillet2
    # the kernel refuses this fillet: 6 mm, written as the material it takes off along each edge
    with BuildSketch(Plane(origin=(-32.275138024, -4.443316345, -19.093597502), x_dir=(0.5282998062723766, 0, -0.8490578983158743), z_dir=(0, 1, 0))) as fillet2_piece_1:
        with BuildLine():
            CenterArc((2.770578985, 5.899824462), FILLET2_R, 229.219707945, 30.295762434)
            Line((-1.148382112, 1.35650586), (-1.226761334, 1.265639488))
            ThreePointArc((-1.226761334, 1.265639488), (-0.612581404, 0.645752673), (-0.102555687, -0.062308354))
            Line((-0.102555687, -0.062308354), (0.002686014, -0.119969935))
            ThreePointArc((0.002686014, -0.119969935), (0.839379399, -0.110604719), (1.656922395, -0.117996489))
            Line((1.656922395, -0.117996489), (1.678758799, 0))
        make_face()
    extrude(amount=21.88663269, mode=Mode.SUBTRACT)

    # Sketch2 → Cut-Extrude1 (cut)
    with BuildSketch(Plane(origin=(0, 13, 0), x_dir=(1, 0, 0), z_dir=(0, 1, 0))):
        with Locations(Location((37.416132554, 25.000660486, 0), (0, 0, 270))):
            Circle(SKETCH2_R)
    cut_extrude1 = extrude(amount=-CUT_EXTRUDE1_DEPTH, mode=Mode.SUBTRACT)

    # CirPattern1: Cut-Extrude1 ×8 about axis
    cirpattern1_axis = Axis((0, 0, 0), (0, 1, 0))
    for i in range(1, CIRPATTERN1_COUNT):
        add(cut_extrude1.rotate(cirpattern1_axis, i * 360 / CIRPATTERN1_COUNT), mode=Mode.SUBTRACT)


solid = part.part
